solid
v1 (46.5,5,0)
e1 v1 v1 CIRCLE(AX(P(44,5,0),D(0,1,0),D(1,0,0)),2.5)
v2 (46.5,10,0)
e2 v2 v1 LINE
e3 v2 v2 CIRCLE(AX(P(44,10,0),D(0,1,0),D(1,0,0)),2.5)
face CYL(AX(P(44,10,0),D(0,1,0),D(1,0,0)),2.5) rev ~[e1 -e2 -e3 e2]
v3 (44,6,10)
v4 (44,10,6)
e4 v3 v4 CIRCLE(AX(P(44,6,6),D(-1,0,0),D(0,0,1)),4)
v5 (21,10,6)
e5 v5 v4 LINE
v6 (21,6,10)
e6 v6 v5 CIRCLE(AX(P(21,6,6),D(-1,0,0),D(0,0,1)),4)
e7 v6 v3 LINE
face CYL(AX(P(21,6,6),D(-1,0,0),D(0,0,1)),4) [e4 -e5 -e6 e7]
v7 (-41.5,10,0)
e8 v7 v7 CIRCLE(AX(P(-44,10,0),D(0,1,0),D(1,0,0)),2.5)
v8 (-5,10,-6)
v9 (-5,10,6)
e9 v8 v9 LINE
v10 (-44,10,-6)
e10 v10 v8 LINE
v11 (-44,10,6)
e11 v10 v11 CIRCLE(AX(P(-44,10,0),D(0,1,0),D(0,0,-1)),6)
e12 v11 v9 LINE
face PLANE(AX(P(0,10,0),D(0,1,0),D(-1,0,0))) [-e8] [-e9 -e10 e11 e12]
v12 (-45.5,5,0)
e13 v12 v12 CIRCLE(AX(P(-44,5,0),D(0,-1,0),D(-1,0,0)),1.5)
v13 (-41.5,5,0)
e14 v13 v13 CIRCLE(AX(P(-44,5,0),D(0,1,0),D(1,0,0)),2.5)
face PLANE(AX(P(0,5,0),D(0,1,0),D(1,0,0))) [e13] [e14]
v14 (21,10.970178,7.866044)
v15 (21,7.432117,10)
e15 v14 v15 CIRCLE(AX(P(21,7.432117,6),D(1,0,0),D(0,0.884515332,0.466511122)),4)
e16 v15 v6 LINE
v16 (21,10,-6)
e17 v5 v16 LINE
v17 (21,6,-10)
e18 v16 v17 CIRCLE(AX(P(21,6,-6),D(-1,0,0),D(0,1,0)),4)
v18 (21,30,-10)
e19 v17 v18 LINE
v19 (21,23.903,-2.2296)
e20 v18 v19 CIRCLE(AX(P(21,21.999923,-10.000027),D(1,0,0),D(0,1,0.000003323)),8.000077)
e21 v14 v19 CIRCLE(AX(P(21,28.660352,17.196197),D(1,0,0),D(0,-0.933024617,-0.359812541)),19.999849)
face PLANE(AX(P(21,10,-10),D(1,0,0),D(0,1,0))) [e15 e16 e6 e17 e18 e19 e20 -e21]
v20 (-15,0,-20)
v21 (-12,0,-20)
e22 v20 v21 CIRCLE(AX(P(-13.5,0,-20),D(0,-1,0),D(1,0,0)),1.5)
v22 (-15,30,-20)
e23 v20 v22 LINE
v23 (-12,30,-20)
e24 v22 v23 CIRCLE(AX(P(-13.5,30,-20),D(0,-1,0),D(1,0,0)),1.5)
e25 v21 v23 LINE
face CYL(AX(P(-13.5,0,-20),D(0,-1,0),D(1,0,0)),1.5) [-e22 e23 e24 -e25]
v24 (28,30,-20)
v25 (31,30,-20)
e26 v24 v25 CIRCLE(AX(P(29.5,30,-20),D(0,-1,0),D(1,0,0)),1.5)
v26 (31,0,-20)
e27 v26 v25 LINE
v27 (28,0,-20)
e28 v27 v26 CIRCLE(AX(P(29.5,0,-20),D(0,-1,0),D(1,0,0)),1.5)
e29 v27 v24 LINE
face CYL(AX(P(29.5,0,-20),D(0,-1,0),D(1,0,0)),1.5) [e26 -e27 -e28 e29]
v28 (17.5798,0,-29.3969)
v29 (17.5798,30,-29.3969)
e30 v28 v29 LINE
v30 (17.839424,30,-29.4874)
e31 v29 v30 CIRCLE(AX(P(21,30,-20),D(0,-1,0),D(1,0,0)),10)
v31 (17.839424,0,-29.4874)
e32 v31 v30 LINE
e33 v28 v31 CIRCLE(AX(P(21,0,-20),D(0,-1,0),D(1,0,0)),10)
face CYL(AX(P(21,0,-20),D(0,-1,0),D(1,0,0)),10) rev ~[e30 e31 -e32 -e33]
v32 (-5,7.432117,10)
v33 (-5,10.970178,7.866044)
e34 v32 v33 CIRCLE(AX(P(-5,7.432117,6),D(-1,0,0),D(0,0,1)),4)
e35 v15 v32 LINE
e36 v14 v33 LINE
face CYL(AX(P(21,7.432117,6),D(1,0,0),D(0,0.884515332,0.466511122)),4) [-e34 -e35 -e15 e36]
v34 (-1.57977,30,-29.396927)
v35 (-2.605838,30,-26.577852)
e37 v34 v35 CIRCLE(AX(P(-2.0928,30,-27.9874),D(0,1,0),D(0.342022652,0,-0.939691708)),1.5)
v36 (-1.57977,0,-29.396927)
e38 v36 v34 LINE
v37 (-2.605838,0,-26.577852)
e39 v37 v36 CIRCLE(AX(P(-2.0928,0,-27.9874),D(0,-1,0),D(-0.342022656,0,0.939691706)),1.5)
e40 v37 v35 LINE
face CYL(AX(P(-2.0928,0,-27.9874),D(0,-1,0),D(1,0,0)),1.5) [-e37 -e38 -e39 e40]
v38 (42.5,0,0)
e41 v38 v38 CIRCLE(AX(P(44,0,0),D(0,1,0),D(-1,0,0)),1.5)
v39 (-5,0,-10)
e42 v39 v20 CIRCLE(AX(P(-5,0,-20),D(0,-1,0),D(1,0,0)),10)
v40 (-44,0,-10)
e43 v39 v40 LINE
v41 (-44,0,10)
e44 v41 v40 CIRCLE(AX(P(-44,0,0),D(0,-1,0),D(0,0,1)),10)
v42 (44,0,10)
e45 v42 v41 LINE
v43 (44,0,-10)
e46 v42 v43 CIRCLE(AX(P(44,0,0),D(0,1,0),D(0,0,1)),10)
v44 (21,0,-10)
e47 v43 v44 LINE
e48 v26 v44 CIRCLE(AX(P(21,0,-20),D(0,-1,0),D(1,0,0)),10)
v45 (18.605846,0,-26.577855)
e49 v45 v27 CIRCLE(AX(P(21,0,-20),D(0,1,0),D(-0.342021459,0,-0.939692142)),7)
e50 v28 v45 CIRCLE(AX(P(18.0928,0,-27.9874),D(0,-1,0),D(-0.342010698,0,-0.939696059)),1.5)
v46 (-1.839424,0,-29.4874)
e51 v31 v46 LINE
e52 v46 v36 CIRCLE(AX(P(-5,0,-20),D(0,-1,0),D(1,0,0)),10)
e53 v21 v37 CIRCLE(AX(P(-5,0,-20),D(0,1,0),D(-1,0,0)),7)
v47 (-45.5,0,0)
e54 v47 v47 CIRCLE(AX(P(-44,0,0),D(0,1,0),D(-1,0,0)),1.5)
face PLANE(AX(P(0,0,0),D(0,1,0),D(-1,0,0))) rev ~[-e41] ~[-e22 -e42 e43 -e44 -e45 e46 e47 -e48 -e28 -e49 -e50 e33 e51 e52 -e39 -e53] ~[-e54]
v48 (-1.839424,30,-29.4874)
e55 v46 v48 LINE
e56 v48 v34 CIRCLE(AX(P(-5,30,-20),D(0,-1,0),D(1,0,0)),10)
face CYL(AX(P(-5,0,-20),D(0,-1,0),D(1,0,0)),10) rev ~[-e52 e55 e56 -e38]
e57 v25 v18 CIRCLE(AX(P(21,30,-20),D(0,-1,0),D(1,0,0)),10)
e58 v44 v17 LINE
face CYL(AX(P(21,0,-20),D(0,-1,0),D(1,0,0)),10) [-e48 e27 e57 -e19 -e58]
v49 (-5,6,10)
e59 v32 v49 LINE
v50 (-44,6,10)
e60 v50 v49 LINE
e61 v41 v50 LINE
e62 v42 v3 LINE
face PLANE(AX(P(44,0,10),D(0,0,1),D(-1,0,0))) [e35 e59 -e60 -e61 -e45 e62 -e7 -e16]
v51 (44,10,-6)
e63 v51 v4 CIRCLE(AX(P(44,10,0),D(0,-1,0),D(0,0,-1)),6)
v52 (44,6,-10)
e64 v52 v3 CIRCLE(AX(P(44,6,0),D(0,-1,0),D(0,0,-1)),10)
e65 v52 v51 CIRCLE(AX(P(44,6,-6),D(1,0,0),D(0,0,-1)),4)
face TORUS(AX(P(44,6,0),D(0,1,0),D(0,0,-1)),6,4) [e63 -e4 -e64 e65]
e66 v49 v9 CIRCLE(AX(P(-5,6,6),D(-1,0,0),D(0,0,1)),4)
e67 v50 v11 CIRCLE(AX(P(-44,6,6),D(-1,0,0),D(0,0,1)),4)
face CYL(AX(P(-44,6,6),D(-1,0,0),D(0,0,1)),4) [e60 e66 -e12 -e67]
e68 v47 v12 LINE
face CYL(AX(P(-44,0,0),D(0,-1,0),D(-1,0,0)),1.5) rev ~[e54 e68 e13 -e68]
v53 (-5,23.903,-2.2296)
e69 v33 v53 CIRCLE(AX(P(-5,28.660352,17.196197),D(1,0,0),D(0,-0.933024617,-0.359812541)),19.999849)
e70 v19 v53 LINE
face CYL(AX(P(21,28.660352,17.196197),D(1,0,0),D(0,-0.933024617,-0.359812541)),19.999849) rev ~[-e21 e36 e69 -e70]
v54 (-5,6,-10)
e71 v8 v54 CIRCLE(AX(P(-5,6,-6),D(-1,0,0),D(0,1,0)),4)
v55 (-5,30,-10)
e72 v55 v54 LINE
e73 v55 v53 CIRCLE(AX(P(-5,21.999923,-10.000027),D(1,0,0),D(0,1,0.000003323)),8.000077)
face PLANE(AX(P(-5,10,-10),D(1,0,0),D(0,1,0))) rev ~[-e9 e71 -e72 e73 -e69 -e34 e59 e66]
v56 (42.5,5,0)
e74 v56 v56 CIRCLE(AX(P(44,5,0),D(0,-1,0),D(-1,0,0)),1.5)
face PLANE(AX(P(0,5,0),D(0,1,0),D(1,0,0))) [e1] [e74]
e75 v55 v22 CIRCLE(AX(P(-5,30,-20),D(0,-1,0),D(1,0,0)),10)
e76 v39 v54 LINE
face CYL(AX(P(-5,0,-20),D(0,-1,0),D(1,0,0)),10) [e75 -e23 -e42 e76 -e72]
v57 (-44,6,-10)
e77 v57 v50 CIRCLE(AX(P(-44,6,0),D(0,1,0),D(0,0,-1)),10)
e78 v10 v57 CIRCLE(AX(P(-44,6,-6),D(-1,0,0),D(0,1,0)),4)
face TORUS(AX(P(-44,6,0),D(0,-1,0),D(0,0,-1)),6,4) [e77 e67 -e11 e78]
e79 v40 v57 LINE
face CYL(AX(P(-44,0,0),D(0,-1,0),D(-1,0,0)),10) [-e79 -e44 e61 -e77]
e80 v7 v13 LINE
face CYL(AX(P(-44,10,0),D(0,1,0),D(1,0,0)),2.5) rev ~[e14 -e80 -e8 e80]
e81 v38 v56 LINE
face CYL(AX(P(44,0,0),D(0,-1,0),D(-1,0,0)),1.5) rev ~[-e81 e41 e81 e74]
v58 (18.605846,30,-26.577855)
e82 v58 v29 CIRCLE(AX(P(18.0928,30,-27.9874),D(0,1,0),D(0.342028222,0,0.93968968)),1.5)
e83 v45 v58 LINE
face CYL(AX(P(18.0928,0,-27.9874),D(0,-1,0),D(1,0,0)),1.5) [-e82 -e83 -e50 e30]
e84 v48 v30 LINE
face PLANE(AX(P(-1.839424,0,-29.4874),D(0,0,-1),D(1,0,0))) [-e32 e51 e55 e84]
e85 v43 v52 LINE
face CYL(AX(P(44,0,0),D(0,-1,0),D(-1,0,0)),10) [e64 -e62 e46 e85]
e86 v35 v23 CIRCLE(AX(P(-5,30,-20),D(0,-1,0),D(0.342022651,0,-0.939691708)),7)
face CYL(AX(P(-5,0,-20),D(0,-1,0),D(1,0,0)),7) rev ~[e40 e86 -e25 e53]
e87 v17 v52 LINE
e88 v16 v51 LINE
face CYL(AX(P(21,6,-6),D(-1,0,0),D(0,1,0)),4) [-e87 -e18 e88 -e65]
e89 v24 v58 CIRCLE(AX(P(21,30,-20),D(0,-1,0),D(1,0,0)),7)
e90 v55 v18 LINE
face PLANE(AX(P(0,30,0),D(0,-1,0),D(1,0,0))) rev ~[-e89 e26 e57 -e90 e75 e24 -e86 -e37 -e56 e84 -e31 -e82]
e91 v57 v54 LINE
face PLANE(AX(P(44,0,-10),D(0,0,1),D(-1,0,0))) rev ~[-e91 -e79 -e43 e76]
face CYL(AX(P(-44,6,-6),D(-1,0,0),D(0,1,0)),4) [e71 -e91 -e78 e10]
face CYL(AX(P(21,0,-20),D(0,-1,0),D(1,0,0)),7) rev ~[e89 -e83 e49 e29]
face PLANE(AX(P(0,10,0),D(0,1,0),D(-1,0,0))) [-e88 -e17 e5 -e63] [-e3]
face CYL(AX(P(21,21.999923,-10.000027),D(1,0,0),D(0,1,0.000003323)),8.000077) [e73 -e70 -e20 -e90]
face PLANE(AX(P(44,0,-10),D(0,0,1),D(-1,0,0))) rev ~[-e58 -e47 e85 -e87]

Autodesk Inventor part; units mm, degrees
ref_plane "XZ Plane" through (0, 0, 0) normal (0, 1, 0) x (-1, 0, 0)
ref_plane "XY Plane" through (0, 0, 0) normal (0, 0, 1) x (1, 0, 0)
sketch "스케치1" plane through (0, 0, 0) normal (0, 1, 0) x (-1, 0, 0)
  line L0 (0, -14) -> (0, 14) projected
  line L1 (75.6, 0) -> (-75.6, 0) projected
  circle A0 centre (44, 0) radius 1.5
  circle A1 centre (44, 0) radius 10
  line L2 (44, -10) -> (0, -10)
  line L3 (44, 10) -> (0, 10)
  circle A2 centre (-44, 0) radius 1.5
  circle A3 centre (-44, 0) radius 10
  line L4 (-44, -10) -> (0, -10)
  line L5 (-44, 10) -> (0, 10)
  point P0 (0, 0)
  dimension "d0" = 3
  dimension "d1" = 20
  dimension "d2" = 44
extrude "돌출1" add sketch "스케치1" along normal blind 10 contours L4 A3 L1 L0 | L0 L1 A1 L2 | L1 A3 L5 L0 | L0 L3 A1 L1 | A1 L1 A0 | A3 L1 A2 | A1 L1 A0 | L1 A2 A3
sketch "스케치2" plane through (0, 10, 0) normal (0, 1, 0) x (1, 0, 0)
  circle A0 centre (-44, 0) radius 1.5 projected
  circle A1 centre (44, 0) radius 1.5 projected
  circle A2 centre (-44, 0) radius 2.5
  circle A3 centre (44, 0) radius 2.5
  point P0 (0, 0)
  dimension "d5" = 5
  dimension "d6" = 5
extrude "돌출2" cut sketch "스케치2" against normal blind 5 contours A0 | A1 | A2 | A3
sketch "스케치3" plane through (0, 0, 0) normal (0, -1, 0) x (1, 0, 0)
  line L0 (8, -34.5901) -> (8, 10)
  circle A0 centre (44, 0) radius 1.5 projected
  line L1 (-44, 10) -> (44, 10) projected
  circle A1 centre (21, -20) radius 7
  line L2 (44, -10) -> (-44, -10) projected
  circle A2 centre (21, -20) radius 10
  line L3 (21, -20) -> (11, -20)
  line L4 (21, -20) -> (17.5798, -29.3969)
  line L5 (21, -20) -> (31, -20) construction
  circle A3 centre (18.0928, -27.9874) radius 1.5
  circle A4 centre (29.5, -20) radius 1.5
  line L6 (18.0928, -29.4874) -> (8, -29.4874)
  circle A5 centre (-5, -20) radius 7
  circle A6 centre (-5, -20) radius 10
  circle A7 centre (-2.0928, -27.9874) radius 1.5
  circle A8 centre (-13.5, -20) radius 1.5
  line L7 (-2.0928, -29.4874) -> (8, -29.4874)
  point P0 (0, 0)
  point P1 (18.6059, -26.5778)
  point P2 (28, -20)
  point P3 (21, -10)
  point P4 (-5, -10)
  point P5 (-15, -20)
  point P6 (-12, -20)
  point P7 (-2.6059, -26.5778)
  point P8 (-1.5798, -29.3969)
  point P9 (-1.8394, -29.4874)
  point P10 (17.8394, -29.4874)
  dimension "d9" = 36
  dimension "d10" = 14
  dimension "d11" = 10
  dimension "d12" = 13
  dimension "d13" = 110
extrude "돌출3" add sketch "스케치3" against normal blind 30 contours L7 A6 L2 L0 | L0 L2 A2 L6 | A2 A4 A1 L3 | A6 A7 A5 A8 | A3 L4 | L4 A3 | A2 L3 A1 A3 | A4 | A8 | A7
ref_plane "작업 평면1" through (21, 10, -10) normal (1, 0, 0) x (0, 1, 0)
sketch "스케치4" plane through (21, 10, -10) normal (1, 0, 0) x (0, 1, 0)
  line L0 (20, -10) -> (20, 0) projected
  arc A0 (20, 0) -> (13.903, 7.7704) centre (12, 0) ccw
  arc A1 (0, 20) -> (13.903, 7.7704) centre (18.6605, 27.1963) ccw
  line L1 (20, -3) -> (20, -16.5778) projected
  line L2 (0, 0) -> (20, 0) projected
  line L3 (0, 12.5) -> (0, 7.5) projected
  line L4 (0, 12.5) -> (0, 7.5) projected
  line L5 (0, 20) -> (0, 0) projected
  line L6 (0, 0) -> (0, 20) projected
  point P0 (-10, 10)
  dimension "d16" = 8
  dimension "d17" = 20
extrude "돌출4" add sketch "스케치4" against normal blind 26
fillet "모깎기1" radius 4 1 edges at (-24.5, 10, 10)
fillet_without_effect "모깎기2"
properties part number "카메라 하단"
